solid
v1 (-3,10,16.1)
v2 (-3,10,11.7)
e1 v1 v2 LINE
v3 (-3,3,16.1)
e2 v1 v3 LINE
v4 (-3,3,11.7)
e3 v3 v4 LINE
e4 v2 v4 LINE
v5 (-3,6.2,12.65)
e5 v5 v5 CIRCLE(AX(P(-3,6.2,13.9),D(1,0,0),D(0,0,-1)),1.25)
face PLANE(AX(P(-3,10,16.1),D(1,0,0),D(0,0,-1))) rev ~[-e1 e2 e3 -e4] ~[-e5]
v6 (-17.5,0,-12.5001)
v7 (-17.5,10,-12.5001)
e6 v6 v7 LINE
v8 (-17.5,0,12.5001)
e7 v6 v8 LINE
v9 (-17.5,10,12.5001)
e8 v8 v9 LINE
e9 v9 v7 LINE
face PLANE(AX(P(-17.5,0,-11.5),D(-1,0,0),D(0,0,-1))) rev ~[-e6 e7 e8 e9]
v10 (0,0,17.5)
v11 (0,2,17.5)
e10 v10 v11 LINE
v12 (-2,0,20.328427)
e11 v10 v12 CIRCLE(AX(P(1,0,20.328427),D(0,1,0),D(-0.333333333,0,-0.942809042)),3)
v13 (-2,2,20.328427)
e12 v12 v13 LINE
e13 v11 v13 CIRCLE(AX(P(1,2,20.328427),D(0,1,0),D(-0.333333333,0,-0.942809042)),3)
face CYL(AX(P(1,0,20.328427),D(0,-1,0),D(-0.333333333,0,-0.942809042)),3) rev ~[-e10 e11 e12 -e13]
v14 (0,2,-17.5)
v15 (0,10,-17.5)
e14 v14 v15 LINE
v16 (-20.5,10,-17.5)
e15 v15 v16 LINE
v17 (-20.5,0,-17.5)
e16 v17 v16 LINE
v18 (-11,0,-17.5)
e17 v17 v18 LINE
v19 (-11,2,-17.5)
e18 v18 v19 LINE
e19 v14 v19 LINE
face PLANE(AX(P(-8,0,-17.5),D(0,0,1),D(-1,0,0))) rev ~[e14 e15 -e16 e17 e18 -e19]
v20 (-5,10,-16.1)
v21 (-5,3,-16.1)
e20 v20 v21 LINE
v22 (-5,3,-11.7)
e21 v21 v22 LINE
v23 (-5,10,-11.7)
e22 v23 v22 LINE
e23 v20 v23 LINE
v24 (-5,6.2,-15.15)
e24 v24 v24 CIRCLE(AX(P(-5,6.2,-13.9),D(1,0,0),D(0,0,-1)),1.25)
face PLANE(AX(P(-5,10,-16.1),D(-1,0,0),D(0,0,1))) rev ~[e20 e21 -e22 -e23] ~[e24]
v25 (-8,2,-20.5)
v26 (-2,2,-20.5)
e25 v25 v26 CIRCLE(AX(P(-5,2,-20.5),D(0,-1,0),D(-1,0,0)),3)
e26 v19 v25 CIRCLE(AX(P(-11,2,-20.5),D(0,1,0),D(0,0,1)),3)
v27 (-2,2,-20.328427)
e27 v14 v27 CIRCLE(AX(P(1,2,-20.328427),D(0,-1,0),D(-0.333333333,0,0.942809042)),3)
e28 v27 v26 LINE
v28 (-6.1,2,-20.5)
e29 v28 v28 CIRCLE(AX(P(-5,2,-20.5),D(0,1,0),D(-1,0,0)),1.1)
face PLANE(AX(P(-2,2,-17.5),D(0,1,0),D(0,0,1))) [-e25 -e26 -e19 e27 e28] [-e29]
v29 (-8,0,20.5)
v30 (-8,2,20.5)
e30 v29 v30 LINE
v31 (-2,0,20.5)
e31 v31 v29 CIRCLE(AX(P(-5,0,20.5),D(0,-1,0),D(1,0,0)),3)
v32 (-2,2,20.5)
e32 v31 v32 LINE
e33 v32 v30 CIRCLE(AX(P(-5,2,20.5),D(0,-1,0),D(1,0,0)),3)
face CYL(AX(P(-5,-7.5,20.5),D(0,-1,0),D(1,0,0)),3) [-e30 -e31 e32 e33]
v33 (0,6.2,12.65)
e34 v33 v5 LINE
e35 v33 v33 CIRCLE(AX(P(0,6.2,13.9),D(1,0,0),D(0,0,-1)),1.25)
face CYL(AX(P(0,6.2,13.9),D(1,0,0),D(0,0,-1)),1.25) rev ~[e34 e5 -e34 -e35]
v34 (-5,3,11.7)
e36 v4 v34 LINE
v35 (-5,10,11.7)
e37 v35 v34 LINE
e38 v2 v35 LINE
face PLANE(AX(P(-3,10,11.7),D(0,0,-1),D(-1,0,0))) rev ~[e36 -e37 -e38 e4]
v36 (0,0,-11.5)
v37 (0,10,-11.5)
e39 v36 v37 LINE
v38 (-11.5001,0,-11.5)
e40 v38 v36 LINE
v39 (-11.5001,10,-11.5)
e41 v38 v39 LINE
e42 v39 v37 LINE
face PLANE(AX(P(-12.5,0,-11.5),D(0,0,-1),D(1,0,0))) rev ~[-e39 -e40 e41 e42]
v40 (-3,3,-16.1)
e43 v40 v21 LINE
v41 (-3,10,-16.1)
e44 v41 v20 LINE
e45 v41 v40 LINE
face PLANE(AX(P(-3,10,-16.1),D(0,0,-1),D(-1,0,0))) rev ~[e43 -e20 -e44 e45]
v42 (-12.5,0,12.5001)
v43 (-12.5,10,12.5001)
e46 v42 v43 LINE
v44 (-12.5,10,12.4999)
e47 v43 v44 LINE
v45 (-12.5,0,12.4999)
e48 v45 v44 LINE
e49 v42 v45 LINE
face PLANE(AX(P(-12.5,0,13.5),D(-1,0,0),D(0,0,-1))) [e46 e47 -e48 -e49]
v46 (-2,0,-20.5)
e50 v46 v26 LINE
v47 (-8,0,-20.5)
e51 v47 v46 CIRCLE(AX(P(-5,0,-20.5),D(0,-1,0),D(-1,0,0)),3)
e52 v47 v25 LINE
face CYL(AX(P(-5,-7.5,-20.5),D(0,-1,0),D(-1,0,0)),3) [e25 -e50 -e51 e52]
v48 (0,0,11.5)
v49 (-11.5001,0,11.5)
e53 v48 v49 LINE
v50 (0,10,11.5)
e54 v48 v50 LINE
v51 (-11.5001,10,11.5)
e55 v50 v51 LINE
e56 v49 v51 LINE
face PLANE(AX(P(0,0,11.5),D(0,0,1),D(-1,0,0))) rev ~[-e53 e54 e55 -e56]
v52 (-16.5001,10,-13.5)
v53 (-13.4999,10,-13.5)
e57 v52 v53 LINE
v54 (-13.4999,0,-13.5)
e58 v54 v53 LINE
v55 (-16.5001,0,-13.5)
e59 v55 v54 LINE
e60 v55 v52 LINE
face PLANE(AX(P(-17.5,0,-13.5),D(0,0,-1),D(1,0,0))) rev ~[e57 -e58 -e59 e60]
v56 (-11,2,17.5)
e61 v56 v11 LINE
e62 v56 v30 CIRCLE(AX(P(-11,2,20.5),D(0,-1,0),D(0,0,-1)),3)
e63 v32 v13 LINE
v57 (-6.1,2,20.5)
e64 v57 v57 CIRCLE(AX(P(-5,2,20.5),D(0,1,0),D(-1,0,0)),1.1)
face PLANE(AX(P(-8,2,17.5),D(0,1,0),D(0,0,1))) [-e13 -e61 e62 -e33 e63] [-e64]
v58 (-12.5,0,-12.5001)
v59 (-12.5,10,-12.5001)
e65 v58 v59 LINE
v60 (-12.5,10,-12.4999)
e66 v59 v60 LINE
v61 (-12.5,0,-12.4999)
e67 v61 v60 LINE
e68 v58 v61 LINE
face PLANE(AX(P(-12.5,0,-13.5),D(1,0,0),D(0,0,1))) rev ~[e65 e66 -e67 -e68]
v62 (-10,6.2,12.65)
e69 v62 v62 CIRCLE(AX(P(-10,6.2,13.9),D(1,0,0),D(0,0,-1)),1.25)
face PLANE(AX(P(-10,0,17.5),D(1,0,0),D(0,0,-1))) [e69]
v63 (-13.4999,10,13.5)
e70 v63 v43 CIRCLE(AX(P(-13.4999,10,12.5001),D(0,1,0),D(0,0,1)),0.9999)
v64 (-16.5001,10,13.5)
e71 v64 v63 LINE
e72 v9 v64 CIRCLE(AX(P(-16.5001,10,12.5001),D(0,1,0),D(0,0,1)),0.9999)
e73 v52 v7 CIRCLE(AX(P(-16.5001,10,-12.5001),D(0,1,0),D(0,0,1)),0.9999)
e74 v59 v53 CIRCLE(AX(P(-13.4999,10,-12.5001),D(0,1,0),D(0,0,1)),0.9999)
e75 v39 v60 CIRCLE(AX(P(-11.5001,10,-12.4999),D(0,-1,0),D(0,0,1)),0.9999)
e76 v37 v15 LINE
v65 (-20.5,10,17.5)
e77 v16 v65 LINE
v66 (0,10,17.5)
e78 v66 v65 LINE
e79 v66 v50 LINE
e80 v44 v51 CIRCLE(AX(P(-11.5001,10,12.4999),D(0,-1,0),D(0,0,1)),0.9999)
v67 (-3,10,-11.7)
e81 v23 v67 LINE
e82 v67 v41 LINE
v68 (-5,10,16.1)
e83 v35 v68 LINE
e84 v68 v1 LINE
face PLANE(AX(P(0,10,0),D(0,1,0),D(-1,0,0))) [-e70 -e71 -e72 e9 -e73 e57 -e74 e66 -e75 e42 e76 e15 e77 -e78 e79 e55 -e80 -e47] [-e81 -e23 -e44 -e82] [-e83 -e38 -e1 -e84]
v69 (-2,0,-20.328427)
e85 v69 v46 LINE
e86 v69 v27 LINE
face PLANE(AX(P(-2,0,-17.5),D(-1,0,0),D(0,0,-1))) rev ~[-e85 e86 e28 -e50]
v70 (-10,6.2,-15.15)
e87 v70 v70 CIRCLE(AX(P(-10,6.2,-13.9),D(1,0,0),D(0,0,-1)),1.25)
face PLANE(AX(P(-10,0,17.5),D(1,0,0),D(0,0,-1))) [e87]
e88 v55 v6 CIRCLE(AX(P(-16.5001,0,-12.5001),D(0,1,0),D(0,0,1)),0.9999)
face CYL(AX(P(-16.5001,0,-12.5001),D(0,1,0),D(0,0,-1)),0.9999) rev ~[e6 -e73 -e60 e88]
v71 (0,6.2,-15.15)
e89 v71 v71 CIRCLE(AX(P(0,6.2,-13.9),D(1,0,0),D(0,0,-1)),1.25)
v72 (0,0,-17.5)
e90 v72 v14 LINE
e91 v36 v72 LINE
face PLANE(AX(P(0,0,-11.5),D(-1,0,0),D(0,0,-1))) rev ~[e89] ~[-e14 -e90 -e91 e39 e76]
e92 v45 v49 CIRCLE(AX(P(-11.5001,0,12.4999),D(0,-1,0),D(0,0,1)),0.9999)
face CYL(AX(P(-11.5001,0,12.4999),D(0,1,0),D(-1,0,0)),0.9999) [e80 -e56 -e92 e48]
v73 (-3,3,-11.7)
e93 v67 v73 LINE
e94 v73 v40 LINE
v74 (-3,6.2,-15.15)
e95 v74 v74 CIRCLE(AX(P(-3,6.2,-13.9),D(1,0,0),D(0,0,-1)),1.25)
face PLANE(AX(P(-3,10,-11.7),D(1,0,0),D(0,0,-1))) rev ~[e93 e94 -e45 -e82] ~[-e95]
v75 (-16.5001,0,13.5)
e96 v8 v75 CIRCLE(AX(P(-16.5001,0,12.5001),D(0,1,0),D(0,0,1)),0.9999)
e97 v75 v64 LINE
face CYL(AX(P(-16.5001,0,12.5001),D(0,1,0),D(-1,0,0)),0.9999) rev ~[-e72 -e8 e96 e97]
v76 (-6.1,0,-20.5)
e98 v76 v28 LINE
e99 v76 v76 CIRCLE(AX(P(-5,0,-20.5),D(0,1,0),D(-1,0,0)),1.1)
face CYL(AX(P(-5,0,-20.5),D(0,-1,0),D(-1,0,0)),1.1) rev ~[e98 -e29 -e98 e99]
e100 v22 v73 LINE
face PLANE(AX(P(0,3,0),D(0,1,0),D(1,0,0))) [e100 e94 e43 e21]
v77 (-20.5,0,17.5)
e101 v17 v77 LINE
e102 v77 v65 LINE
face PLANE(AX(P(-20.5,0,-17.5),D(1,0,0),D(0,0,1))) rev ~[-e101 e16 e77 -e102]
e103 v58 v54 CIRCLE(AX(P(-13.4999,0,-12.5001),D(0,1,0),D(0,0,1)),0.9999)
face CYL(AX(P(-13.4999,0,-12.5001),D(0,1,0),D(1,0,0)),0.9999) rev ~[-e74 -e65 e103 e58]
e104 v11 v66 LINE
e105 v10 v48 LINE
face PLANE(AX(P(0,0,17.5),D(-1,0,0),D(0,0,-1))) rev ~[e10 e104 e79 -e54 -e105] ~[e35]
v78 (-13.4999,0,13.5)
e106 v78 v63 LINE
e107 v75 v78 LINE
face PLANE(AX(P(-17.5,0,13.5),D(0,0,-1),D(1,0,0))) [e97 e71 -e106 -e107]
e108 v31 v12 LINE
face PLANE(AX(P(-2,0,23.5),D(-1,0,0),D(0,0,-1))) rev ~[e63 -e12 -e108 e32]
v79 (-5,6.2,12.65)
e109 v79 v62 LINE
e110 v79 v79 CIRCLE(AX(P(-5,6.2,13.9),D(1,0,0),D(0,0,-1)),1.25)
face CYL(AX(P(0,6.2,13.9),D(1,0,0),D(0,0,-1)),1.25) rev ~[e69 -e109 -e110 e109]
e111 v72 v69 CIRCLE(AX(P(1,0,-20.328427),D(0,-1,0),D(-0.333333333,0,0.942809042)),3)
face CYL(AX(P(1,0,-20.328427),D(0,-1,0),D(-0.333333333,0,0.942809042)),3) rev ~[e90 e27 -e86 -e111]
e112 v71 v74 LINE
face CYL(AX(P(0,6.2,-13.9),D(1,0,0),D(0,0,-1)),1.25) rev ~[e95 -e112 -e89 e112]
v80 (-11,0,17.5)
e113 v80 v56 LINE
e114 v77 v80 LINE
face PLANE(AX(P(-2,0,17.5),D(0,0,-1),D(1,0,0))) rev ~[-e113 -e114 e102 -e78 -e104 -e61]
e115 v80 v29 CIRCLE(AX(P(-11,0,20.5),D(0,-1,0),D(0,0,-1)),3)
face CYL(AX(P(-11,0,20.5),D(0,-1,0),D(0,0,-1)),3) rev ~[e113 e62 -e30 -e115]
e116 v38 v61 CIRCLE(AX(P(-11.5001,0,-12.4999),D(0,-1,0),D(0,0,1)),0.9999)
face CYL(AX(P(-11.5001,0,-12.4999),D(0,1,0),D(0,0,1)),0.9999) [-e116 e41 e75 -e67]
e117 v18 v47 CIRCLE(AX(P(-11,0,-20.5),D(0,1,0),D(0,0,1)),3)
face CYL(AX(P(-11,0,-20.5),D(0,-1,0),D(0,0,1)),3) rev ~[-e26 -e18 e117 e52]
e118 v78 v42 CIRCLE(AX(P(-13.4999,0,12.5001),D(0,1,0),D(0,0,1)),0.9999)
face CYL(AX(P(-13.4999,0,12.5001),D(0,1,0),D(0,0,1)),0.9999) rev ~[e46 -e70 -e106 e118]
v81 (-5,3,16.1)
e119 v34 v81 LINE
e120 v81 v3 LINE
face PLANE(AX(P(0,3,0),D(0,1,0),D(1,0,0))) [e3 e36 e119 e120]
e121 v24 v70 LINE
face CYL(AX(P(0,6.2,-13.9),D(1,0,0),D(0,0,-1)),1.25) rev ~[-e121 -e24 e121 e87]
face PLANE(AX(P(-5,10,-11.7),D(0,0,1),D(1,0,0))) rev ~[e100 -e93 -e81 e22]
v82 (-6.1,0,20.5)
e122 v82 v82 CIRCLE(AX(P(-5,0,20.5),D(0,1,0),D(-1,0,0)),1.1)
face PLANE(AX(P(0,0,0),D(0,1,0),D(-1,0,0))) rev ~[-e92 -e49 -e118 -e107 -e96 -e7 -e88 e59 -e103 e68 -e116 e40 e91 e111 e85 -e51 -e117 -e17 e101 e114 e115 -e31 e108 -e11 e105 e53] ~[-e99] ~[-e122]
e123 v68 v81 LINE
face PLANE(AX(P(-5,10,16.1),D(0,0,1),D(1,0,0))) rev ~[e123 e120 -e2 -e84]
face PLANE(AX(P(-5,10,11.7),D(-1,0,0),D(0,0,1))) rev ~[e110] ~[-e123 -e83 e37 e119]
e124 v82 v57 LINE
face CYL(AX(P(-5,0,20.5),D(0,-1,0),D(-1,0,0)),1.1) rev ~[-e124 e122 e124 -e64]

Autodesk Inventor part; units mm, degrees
ref_plane "YZ Plane" through (0, 0, 0) normal (1, 0, 0) x (0, 1, 0)
ref_plane "XZ Plane" through (0, 0, 0) normal (0, 1, 0) x (-1, 0, 0)
ref_plane "XY Plane" through (0, 0, 0) normal (0, 0, 1) x (1, 0, 0)
sketch "Sketch1" plane through (0, 0, 0) normal (0, 1, 0) x (-1, 0, 0)
  line L0 (0, 17.5) -> (0, 11.5)
  line L1 (0, 11.5) -> (17.5, 11.5)
  line L2 (17.5, 11.5) -> (17.5, 0)
  line L3 (17.5, 0) -> (17.5, -11.5)
  line L4 (17.5, -11.5) -> (0, -11.5)
  line L5 (0, -11.5) -> (0, -17.5)
  line L6 (0, -17.5) -> (20.5, -17.5)
  line L7 (20.5, -17.5) -> (20.5, 17.5)
  line L8 (20.5, 17.5) -> (0, 17.5)
  line L9 (0, 0) -> (0, 11.5) construction
  line L10 (0, 0) -> (0, -11.5) construction
  line L11 (8, 17.5) -> (8, 23.5)
  line L12 (8, 23.5) -> (2, 23.5)
  line L13 (2, 23.5) -> (2, 17.5)
  line L14 (2, -17.5) -> (2, -23.5)
  line L15 (2, -23.5) -> (8, -23.5)
  line L16 (8, -23.5) -> (8, -17.5)
  circle A0 centre (5, 20.5) radius 1.1
  circle A1 centre (5, -20.5) radius 1.1
  line L17 (5, 20.5) -> (5, 23.5) construction
  line L18 (5, -20.5) -> (5, -23.5) construction
  line L19 (5, -20.5) -> (5, 20.5) construction
  line L20 (17.5, 11.5) -> (17.5, 13.5)
  line L21 (17.5, 13.5) -> (12.5, 13.5)
  line L22 (12.5, 13.5) -> (12.5, 11.5)
  line L23 (17.5, -11.5) -> (17.5, -13.5)
  line L24 (17.5, -13.5) -> (12.5, -13.5)
  line L25 (12.5, -13.5) -> (12.5, -11.5)
  dimension "d0" = 23
  dimension "d1" = 17.5
  dimension "d2" = 3
  dimension "d4" = 6
  dimension "d16" = 2.2
  dimension "d17" = 2.2
  dimension "d18" = 3
  dimension "d19" = 3
  dimension "d24" = 41
  dimension "d26" = 5
  dimension "d27" = 5
  dimension "d28" = 2
extrude "Extrusion1" add sketch "Sketch1" along normal blind 10 contours L8 L7 L6 L5 L4 L25 L24 L23 L3 L2 L20 L21 L22 L1 L0
sketch "Sketch2" plane through (0, 0, 17.5) normal (1, 0, 0) x (0, 0, -1)
  line L0 (6, 0) -> (6, 10) projected
  line L1 (0, 10) -> (6, 10) projected
  line L2 (0, 0) -> (0, 10) projected
  line L3 (35, 0) -> (35, 10) projected
  line L4 (29, 10) -> (35, 10) projected
  line L5 (29, 0) -> (29, 10) projected
  circle A0 centre (3.6, 6.2) radius 1.25
  circle A1 centre (31.4, 6.2) radius 1.25
  line L6 (3.6, 6.2) -> (3.6, 0) construction
  line L7 (31.4, 6.2) -> (31.4, 0) construction
  line L8 (6, 0) -> (3.6, 0) construction
  line L9 (29, 0) -> (31.4, 0) construction
  line L10 (3.6, 6.2) -> (6, 6.2) construction
  line L11 (31.4, 6.2) -> (29, 6.2) construction
  point P0 (17.5, 0)
  dimension "d7" = 2.5
  dimension "d31" = 27.8
  dimension "d33" = 6.2
extrude "Extrusion2" cut sketch "Sketch2" against normal blind 10
sketch "Sketch3" plane through (0, 10, 0) normal (0, 1, 0) x (1, 0, 0)
  line L0 (0, -11.5) -> (-12.5, -11.5) projected
  line L1 (-17.5, -13.5) -> (-17.5, 13.5) projected
  line L2 (-12.5, 11.5) -> (0, 11.5) projected
  line L3 (0, 17.5) -> (-20.5, 17.5) projected
  line L4 (-20.5, 17.5) -> (-20.5, -17.5) projected
  line L5 (-20.5, -17.5) -> (0, -17.5) projected
  line L6 (-3, -11.7) -> (-5, -11.7)
  line L7 (-5, -11.7) -> (-5, -16.1)
  line L8 (-5, -16.1) -> (-3, -16.1)
  line L9 (-3, -16.1) -> (-3, -11.7)
  line L10 (-3, -11.7) -> (-5, -16.1) construction
  line L11 (-5, -11.7) -> (-3, -16.1) construction
  line L12 (-3, 16.1) -> (-5, 16.1)
  line L13 (-5, 16.1) -> (-5, 11.7)
  line L14 (-5, 11.7) -> (-3, 11.7)
  line L15 (-3, 11.7) -> (-3, 16.1)
  line L16 (-3, 16.1) -> (-5, 11.7) construction
  line L17 (-5, 16.1) -> (-3, 11.7) construction
  line L18 (-12.5, -11.5) -> (-12.5, -13.5) projected
  line L19 (-12.5, -13.5) -> (-17.5, -13.5) projected
  line L20 (-17.5, 13.5) -> (-12.5, 13.5) projected
  line L21 (-12.5, 13.5) -> (-12.5, 11.5) projected
  line L22 (0, -12.65) -> (0, -15.15) projected
  line L23 (0, 15.15) -> (0, 12.65) projected
  line L24 (0, 13.9) -> (-3, 13.9) construction
  line L25 (-3, -13.9) -> (0, -13.9) construction
  point P0 (0, 0)
  dimension "d11" = 4.4
  dimension "d13" = 2
  dimension "d34" = 3
extrude "Extrusion3" cut sketch "Sketch3" against normal blind 7
extrude "Extrusion4" add sketch "Sketch1" along normal blind 2 contours L13 L12 L11 L8 | L16 L15 L14 L6
fillet "Fillet1" radius 3 8 edges at (-2, 1, 17.5) (-2, 1, -17.5) (-8, 1, 17.5) (-8, 1, -17.5) (-2, 1, 23.5) (-8, 1, 23.5) (-8, 1, -23.5) (-2, 1, -23.5)
fillet "Fillet2" radius 1 6 edges at (-17.5, 5, 13.5) (-12.5, 5, 13.5) (-12.5, 5, 11.5) (-17.5, 5, -13.5) (-12.5, 5, -13.5) (-12.5, 5, -11.5)
properties part number "Servo Holder_3DPrint"
